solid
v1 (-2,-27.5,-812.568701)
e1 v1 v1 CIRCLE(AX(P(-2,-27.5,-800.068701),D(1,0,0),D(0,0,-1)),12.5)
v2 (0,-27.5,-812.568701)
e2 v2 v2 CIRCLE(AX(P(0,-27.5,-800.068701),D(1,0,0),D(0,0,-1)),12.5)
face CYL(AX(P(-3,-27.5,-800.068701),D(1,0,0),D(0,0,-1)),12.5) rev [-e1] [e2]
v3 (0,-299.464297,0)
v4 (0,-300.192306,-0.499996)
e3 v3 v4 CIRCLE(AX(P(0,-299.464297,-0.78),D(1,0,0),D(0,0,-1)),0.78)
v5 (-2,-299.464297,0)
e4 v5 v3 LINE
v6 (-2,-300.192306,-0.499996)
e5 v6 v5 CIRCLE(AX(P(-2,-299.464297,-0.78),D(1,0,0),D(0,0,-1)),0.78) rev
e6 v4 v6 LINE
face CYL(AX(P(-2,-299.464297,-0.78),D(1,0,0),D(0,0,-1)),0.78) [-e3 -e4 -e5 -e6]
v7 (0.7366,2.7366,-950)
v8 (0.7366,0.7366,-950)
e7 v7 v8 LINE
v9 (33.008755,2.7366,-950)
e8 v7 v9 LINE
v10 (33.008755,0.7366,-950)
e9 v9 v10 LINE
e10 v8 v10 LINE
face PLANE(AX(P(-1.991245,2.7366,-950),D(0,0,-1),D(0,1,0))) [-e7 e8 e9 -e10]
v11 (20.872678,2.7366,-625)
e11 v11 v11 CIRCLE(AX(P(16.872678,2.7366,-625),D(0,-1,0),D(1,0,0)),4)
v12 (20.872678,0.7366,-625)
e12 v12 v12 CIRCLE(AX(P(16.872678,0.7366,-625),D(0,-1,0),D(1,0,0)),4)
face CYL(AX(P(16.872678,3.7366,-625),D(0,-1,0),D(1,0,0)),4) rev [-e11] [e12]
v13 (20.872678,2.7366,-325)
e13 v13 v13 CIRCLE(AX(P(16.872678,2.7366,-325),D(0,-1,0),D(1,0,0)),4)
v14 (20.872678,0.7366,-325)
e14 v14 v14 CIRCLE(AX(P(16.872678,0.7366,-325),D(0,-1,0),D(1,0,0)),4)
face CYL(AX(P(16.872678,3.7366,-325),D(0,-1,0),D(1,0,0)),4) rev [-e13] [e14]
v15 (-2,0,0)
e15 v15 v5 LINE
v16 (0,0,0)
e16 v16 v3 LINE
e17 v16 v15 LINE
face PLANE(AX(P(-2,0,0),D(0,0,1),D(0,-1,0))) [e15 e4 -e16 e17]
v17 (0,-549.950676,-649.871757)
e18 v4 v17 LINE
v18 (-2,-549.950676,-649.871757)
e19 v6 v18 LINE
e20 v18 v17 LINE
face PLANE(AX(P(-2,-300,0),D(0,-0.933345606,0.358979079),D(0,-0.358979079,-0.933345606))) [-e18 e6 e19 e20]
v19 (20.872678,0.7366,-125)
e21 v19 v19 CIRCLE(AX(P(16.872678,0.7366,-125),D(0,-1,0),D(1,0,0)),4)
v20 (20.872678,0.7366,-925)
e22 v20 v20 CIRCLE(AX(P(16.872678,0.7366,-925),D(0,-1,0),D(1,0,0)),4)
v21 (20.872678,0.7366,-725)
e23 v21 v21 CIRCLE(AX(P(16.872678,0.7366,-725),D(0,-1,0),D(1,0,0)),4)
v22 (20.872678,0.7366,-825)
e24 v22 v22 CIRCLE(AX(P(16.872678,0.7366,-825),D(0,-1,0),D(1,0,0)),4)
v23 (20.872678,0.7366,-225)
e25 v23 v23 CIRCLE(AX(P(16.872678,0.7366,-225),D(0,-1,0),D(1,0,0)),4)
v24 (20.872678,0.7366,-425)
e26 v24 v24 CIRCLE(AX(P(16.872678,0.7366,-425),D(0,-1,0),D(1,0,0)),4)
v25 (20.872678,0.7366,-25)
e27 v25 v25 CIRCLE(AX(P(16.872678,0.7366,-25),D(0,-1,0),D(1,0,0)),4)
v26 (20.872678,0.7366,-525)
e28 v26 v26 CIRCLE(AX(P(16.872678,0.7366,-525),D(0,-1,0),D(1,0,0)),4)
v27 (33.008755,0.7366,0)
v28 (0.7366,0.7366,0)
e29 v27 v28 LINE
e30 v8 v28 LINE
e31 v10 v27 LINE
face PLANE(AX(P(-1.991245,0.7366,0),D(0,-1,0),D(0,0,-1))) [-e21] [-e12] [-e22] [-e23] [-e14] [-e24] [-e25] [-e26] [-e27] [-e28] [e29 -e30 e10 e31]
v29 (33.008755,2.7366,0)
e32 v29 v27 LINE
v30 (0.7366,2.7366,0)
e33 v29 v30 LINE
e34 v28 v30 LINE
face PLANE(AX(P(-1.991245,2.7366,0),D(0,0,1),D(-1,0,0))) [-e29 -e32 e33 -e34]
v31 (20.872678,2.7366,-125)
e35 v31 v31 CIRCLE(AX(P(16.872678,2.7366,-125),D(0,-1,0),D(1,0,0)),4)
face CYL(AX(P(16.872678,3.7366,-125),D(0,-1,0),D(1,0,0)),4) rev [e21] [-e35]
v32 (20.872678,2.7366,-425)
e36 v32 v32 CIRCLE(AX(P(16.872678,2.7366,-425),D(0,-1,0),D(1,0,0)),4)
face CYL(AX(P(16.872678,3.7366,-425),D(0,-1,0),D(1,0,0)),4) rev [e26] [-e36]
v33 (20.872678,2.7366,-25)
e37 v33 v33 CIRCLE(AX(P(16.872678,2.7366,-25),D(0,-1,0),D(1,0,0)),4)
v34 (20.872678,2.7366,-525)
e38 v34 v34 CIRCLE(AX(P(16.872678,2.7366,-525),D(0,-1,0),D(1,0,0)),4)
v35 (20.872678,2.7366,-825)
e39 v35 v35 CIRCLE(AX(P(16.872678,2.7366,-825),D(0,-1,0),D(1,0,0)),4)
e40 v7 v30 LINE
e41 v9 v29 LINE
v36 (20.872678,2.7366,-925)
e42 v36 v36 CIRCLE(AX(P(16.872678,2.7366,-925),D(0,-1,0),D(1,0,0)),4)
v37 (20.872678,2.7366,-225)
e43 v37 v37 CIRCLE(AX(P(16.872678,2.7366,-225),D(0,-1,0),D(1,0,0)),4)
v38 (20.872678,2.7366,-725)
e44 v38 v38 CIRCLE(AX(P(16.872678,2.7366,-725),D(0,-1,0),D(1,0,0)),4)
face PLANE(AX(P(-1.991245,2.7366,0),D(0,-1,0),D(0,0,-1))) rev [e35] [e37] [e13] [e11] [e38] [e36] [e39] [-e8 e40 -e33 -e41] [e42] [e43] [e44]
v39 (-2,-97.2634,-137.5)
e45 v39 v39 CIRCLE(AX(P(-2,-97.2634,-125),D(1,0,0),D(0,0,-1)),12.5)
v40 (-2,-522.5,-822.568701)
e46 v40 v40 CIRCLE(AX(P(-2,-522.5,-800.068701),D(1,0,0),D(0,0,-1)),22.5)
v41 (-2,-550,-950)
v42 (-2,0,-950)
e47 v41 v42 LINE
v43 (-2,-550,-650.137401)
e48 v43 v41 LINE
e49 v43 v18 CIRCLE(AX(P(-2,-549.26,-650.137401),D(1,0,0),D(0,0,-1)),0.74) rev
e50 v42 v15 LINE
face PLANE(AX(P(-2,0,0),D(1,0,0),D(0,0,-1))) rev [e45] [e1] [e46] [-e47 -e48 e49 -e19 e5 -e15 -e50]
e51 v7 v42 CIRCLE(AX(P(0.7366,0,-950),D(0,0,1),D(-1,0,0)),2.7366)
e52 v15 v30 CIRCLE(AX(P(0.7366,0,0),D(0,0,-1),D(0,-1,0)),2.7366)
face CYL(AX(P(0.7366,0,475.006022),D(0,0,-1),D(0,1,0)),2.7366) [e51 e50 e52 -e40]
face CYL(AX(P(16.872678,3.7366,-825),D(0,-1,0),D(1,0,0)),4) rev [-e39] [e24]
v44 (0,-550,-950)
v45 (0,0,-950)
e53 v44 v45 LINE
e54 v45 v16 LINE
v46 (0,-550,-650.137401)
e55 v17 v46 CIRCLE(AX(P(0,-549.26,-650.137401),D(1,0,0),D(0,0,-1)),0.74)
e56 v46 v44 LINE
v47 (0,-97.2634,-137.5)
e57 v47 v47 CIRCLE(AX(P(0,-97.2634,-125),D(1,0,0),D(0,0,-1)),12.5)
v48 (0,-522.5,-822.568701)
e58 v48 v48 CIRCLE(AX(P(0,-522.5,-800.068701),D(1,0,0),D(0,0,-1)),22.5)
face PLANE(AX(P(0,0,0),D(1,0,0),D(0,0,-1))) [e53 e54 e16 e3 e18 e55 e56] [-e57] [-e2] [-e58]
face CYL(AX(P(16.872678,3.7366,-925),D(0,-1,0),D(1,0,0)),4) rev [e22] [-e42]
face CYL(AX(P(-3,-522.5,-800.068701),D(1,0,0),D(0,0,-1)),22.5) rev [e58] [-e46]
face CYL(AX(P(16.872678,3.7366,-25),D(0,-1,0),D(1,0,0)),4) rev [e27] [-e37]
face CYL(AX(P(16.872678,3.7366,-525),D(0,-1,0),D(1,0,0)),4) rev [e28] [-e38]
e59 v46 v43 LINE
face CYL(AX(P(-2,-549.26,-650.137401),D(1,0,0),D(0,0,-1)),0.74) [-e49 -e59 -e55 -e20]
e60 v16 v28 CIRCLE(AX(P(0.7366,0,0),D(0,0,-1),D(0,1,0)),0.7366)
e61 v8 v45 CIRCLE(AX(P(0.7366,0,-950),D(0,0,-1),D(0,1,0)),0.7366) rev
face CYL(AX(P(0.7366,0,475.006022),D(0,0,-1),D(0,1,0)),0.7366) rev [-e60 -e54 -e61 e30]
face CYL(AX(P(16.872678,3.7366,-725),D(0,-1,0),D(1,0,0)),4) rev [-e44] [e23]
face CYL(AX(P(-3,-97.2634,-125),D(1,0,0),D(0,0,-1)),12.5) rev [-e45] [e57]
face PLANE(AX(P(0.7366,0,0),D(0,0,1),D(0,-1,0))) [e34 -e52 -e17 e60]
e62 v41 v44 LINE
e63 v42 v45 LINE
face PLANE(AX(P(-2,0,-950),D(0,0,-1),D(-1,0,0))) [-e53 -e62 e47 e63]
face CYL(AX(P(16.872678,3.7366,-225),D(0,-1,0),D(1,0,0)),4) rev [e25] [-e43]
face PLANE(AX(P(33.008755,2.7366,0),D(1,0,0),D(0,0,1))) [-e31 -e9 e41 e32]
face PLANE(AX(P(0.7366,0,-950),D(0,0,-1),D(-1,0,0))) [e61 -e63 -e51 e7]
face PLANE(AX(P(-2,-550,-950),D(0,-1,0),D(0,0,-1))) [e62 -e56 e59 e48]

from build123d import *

# Parameters (mm, degrees)
BASE_FLANGE1_DEPTH     = 2
TAB1_START             = -2
TAB1_OUTLINE_W         = 950
TAB1_OUTLINE_H         = 35
TAB1_DEPTH             = 2
SKETCHED_START         = -950
SKETCHED_BEND1_DEPTH   = 950
SKETCHED_BEND1_2_DEPTH = 950
FILLET1_R              = 0.78
FILLET2_R              = 0.74
SKETCH10_R             = 12.5
SKETCH10_R_2           = 22.5
CUT_EXTRUDE1_DEPTH     = 10
SKETCH11_R             = 4
CUT_EXTRUDE2_DEPTH     = 10
SKETCH12_R             = 12.5
CUT_EXTRUDE3_DEPTH     = 10


# Read off the part's stored shape, not the designer's step: Tab1, Sketched Bend1
# Sheet-metal steps are written as plain solids
with BuildPart() as part:
    # Sketch1 → Base-Flange1 (new body)
    with BuildSketch(Plane(origin=(0, 0, 0), x_dir=(0, 0, -1), z_dir=(1, 0, 0))):
        Polygon((0, 0), (0, -300), (650, -550), (950, -550), (950, 0), align=None)
    extrude(amount=-BASE_FLANGE1_DEPTH)

    # Tab1 outline → Tab1 (add)
    with BuildSketch(Plane(origin=(0, 0, 0), x_dir=(0, 0, -1), z_dir=(1, 0, 0)).offset(TAB1_START)):
        with Locations((475, 17.5)):
            Rectangle(TAB1_OUTLINE_W, TAB1_OUTLINE_H)
    extrude(amount=TAB1_DEPTH)

    # Sketched Bend1 outline → Sketched Bend1 (cut)
    with BuildSketch(Plane.XY.offset(SKETCHED_START)):
        with BuildLine():
            ThreePointArc((-2, 0), (-1.443395312, 1.654267209), (0, 2.635602398))
            Line((0, 2.635602398), (0, 35))
            Line((0, 35), (-2, 35))
            Line((-2, 35), (-2, 0))
        make_face()
    extrude(amount=SKETCHED_BEND1_DEPTH, mode=Mode.SUBTRACT)

    # Sketched Bend1 2 outline → Sketched Bend1 2 (add)
    with BuildSketch(Plane.XY.offset(SKETCHED_START)):
        with BuildLine():
            Line((33.008755099, 2.7366), (0.7366, 2.7366))
            ThreePointArc((0.7366, 2.7366), (0.364854094, 2.711233029), (0, 2.635602398))
            Line((0, 2.635602398), (0, 0))
            ThreePointArc((0, 0), (0.215745145, 0.520854855), (0.7366, 0.7366))
            Line((0.7366, 0.7366), (33.008755099, 0.7366))
            Line((33.008755099, 0.7366), (33.008755099, 2.7366))
        make_face()
    extrude(amount=SKETCHED_BEND1_2_DEPTH)

    # Fillet1
    fillet1_edges = [part.edges().sort_by_distance(p)[0] for p in [
        (-1, -300, 0),
    ]]
    fillet(fillet1_edges, radius=FILLET1_R)

    # Fillet2
    fillet2_edges = [part.edges().sort_by_distance(p)[0] for p in [
        (-1, -550, -650),
    ]]
    fillet(fillet2_edges, radius=FILLET2_R)

    # Sketch10 → Cut-Extrude1 (cut)
    with BuildSketch(Plane(origin=(0, 0, 0), x_dir=(0, 0, -1), z_dir=(1, 0, 0))):
        with Locations((800.068700733, -27.5)):
            Circle(SKETCH10_R)
        with Locations((800.068700733, -522.5)):
            Circle(SKETCH10_R_2)
    extrude(amount=-CUT_EXTRUDE1_DEPTH, mode=Mode.SUBTRACT)

    # Sketch11 → Cut-Extrude2 (cut)
    with BuildSketch(Plane.XZ.offset(-0.7366)):
        with Locations((16.872677549, -25)):
            Circle(SKETCH11_R)
        with Locations((16.872677549, -125)):
            Circle(SKETCH11_R)
        with Locations((16.872677549, -225)):
            Circle(SKETCH11_R)
        with Locations((16.872677549, -325)):
            Circle(SKETCH11_R)
        with Locations((16.872677549, -425)):
            Circle(SKETCH11_R)
        with Locations((16.872677549, -525)):
            Circle(SKETCH11_R)
        with Locations((16.872677549, -625)):
            Circle(SKETCH11_R)
        with Locations((16.872677549, -725)):
            Circle(SKETCH11_R)
        with Locations((16.872677549, -825)):
            Circle(SKETCH11_R)
        with Locations((16.872677549, -925)):
            Circle(SKETCH11_R)
    extrude(amount=-CUT_EXTRUDE2_DEPTH, mode=Mode.SUBTRACT)

    # Sketch12 → Cut-Extrude3 (cut)
    with BuildSketch(Plane(origin=(0, 0, 0), x_dir=(0, 0, -1), z_dir=(1, 0, 0))):
        with Locations((125, -97.2634)):
            Circle(SKETCH12_R)
    extrude(amount=-CUT_EXTRUDE3_DEPTH, mode=Mode.SUBTRACT)


solid = part.part
